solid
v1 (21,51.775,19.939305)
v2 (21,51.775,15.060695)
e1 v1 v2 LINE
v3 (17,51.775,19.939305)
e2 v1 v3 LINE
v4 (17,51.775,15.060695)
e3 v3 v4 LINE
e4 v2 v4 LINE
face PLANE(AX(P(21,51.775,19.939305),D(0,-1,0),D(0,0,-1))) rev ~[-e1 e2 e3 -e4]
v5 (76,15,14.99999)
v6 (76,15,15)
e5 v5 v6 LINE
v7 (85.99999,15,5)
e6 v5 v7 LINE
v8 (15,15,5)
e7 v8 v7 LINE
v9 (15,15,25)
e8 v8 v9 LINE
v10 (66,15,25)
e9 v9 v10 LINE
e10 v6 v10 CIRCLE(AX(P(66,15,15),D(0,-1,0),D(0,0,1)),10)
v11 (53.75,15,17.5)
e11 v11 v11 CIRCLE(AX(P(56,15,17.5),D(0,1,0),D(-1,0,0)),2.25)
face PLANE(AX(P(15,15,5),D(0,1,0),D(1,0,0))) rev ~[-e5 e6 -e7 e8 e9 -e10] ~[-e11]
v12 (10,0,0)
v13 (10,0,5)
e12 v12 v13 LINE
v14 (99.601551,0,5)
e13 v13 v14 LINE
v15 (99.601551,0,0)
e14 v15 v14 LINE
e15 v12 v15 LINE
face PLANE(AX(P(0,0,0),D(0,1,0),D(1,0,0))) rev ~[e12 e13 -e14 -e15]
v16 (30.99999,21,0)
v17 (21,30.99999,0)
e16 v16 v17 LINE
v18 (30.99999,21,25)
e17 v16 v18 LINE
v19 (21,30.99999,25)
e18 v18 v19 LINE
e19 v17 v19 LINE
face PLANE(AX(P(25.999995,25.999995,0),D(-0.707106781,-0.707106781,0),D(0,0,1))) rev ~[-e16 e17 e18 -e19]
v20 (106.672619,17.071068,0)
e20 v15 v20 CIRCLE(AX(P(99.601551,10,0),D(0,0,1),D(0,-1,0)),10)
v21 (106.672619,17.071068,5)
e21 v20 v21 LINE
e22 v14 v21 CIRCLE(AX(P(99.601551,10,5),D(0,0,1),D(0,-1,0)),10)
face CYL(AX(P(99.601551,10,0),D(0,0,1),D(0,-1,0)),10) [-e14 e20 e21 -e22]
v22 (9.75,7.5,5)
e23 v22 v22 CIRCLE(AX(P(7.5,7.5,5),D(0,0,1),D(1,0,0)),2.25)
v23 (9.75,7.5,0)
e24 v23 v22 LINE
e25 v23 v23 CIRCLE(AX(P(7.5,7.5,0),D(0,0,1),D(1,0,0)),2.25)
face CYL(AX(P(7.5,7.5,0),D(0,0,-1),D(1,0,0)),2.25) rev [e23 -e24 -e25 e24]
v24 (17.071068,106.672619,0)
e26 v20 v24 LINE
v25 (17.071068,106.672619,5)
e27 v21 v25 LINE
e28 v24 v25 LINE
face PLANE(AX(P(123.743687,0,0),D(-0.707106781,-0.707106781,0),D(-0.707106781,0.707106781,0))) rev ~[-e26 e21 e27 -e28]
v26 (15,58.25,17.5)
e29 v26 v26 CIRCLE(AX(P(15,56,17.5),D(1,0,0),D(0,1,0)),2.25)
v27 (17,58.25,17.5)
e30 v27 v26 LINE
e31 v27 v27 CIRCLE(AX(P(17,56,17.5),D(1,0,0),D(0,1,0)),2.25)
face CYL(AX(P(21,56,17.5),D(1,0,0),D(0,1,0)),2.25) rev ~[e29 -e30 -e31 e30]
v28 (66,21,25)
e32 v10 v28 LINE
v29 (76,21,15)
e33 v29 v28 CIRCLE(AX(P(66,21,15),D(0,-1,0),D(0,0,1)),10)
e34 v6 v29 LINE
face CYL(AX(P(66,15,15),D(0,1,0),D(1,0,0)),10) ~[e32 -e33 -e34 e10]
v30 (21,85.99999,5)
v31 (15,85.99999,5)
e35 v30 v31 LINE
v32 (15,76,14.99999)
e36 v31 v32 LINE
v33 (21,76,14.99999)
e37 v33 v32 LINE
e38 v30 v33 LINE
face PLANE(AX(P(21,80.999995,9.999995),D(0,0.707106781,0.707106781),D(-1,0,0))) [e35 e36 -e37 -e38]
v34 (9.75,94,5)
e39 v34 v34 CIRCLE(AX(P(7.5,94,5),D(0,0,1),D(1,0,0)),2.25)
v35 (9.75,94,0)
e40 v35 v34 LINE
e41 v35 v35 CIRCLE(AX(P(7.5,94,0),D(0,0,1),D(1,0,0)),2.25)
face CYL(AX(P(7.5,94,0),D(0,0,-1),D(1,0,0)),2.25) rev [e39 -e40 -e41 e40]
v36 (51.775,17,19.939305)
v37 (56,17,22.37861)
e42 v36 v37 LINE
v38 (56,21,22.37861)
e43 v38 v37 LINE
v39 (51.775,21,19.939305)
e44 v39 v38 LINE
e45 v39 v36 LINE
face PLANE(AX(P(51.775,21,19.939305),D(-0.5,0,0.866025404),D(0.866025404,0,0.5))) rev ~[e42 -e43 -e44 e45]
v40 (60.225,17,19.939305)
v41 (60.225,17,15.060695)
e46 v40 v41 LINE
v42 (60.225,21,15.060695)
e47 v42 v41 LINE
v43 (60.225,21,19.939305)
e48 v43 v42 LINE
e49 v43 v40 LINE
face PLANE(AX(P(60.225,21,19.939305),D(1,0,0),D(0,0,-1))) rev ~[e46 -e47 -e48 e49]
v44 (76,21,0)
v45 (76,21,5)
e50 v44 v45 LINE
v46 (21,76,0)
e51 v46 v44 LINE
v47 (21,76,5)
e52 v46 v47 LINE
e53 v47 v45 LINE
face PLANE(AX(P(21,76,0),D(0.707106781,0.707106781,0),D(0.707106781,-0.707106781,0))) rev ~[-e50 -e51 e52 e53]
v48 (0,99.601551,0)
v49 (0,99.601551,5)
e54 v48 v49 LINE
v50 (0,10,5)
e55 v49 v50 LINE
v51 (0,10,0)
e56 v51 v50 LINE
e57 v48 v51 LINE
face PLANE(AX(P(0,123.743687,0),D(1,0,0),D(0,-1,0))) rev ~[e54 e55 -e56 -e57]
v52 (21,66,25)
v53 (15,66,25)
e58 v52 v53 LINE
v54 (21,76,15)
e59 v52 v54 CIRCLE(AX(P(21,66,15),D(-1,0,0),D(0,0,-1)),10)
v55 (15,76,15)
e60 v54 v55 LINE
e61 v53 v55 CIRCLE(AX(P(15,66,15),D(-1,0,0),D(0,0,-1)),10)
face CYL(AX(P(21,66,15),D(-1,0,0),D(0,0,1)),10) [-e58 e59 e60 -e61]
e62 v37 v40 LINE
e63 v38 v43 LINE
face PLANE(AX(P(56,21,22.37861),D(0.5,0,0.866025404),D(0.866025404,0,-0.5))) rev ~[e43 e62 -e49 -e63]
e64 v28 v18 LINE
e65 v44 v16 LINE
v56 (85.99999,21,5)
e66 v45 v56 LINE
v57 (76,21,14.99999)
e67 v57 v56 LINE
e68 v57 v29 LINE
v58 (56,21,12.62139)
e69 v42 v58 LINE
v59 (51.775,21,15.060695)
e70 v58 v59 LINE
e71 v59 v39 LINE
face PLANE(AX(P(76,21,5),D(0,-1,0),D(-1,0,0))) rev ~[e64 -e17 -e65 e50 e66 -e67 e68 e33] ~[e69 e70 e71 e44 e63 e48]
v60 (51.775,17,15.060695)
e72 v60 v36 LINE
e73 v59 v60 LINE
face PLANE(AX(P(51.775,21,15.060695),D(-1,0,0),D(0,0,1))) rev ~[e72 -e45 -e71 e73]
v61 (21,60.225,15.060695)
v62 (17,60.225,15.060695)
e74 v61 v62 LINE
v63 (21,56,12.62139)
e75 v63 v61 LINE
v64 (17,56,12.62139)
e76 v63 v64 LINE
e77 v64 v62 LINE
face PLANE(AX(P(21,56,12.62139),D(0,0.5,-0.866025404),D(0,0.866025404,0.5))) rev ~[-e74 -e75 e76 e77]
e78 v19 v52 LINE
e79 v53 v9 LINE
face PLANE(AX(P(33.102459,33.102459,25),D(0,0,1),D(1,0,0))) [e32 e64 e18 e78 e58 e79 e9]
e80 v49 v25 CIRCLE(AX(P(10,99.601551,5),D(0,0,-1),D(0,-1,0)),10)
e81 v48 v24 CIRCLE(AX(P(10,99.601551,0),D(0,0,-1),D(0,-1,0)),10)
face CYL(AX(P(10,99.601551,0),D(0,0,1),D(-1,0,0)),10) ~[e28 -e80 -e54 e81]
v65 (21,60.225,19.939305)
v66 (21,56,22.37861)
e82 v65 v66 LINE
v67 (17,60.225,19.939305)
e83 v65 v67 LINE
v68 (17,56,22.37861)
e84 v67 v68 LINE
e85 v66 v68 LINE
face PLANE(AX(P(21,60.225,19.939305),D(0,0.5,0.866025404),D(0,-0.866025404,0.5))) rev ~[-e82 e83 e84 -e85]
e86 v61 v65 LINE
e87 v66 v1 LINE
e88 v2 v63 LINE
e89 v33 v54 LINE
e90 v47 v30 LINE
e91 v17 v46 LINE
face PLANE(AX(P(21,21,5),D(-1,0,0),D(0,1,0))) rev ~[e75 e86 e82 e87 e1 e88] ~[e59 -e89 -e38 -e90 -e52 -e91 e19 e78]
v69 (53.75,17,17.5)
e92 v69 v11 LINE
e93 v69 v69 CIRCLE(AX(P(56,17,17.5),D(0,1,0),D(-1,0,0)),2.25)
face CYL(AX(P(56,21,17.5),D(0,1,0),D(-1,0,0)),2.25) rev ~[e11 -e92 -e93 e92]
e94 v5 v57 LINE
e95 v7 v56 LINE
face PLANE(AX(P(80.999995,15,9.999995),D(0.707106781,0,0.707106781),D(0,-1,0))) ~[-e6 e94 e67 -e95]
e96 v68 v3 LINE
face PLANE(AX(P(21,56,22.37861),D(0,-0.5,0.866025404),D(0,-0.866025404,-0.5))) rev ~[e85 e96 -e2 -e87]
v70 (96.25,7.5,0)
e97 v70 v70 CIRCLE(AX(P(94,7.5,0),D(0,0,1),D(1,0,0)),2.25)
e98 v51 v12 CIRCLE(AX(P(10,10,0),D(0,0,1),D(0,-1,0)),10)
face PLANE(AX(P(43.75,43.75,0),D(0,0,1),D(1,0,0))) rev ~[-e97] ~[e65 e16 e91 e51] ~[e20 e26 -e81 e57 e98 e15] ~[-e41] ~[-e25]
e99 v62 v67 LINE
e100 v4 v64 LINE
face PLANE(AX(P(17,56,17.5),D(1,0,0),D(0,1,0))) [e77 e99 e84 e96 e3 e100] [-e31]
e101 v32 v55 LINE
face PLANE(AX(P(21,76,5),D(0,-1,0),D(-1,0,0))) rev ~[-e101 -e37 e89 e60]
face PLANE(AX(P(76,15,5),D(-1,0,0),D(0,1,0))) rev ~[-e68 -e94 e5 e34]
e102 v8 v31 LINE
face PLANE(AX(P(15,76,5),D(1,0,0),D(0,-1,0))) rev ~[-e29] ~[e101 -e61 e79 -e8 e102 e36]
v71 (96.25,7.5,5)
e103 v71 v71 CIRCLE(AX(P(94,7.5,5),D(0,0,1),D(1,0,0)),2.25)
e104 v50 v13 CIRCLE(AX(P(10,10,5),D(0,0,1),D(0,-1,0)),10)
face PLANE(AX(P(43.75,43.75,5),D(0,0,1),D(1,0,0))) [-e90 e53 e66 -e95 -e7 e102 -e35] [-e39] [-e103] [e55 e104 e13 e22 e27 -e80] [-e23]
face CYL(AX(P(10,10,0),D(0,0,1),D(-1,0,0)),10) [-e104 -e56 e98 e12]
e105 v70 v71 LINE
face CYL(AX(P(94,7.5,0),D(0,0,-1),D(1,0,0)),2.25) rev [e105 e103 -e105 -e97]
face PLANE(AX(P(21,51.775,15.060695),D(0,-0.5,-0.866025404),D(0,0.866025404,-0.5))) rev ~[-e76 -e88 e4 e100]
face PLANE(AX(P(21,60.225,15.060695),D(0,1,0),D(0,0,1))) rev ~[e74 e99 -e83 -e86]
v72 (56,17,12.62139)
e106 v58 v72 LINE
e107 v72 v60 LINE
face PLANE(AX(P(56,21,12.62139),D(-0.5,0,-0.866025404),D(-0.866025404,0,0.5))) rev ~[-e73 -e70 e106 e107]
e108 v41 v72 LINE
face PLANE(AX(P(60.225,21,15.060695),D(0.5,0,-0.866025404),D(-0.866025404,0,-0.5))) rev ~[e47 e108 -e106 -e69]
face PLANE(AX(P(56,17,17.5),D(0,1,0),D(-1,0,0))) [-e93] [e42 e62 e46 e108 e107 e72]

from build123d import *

# Parameters (mm, degrees)
F0_R      = 2.25
F1_DEPTH  = 5
F3_DEPTH  = 20
F4_R      = 10
F5_R      = 2.25
F6_DEPTH  = 25
F7_R      = 2.25
F8_DEPTH  = 25
F9_SIZE   = 9.99999
F11_DEPTH = 4
F13_DEPTH = 4


# Not quite as in the source:
# - a fillet or chamfer is up to 0.001 mm smaller than in the source, because OpenCascade refuses the exact size


with BuildPart() as f1:
    # F0 (on Top) → F1 (new body)
    with BuildSketch(Plane.XY):
        Polygon((123.7436867076, 0), (0, 123.7436867076), (0, 103.7436867076), (0, 0), (103.7436867076, 0), align=None)
        with Locations((7.5, 7.5)):
            Circle(F0_R, mode=Mode.SUBTRACT)
        Polygon((21, 21), (21, 76), (76, 21), align=None, mode=Mode.SUBTRACT)
        with Locations((94, 7.5)):
            Circle(F0_R, mode=Mode.SUBTRACT)
        with Locations((7.5, 94)):
            Circle(F0_R, mode=Mode.SUBTRACT)
    extrude(amount=F1_DEPTH)

    # F2 (on face) → F3 (join)
    with BuildSketch(Plane.XY.offset(5)):
        Polygon((76, 15), (76, 21), (21, 21), (21, 76), (15, 76), (15, 15), align=None)
    extrude(amount=F3_DEPTH)

    # F4
    f4_edges = [f1.edges().sort_by_distance(p)[0] for p in [
        (0, 123.743687, 2.5),
        (123.743687, 0, 2.5),
        (76, 18, 25),
        (18, 76, 25),
        (0, 0, 2.5),
    ]]
    fillet(f4_edges, radius=F4_R)

    # F5 (on face) → F6 (cut)
    with BuildSketch(Plane.YZ.offset(21)):
        with Locations((56, 17.5)):
            Circle(F5_R)
    extrude(amount=-F6_DEPTH, mode=Mode.SUBTRACT)

    # F7 (on face) → F8 (cut)
    with BuildSketch(Plane(origin=(0, 21, 0), x_dir=(-1, 0, 0), z_dir=(0, 1, 0))):
        with Locations((-56, 17.5)):
            Circle(F7_R)
    extrude(amount=-F8_DEPTH, mode=Mode.SUBTRACT)

    # F9 (size 10 in the source; OpenCascade refuses exactly that, so slightly less here)
    f9_edges = [f1.edges().sort_by_distance(p)[0] for p in [
        (18, 76, 5),
        (76, 18, 5),
        (21, 21, 12.5),
    ]]
    chamfer(f9_edges, length=F9_SIZE)

    # F10 (on face) → F11 (cut)
    with BuildSketch(Plane(origin=(0, 21, 0), x_dir=(-1, 0, 0), z_dir=(0, 1, 0))):
        Polygon((-51.775, 15.0606951127), (-51.775, 19.9393048873), (-56, 22.3786097747), (-60.225, 19.9393048873), (-60.225, 15.0606951127), (-56, 12.6213902253), align=None)
    extrude(amount=-F11_DEPTH, mode=Mode.SUBTRACT)

    # F12 (on face) → F13 (cut)
    with BuildSketch(Plane.YZ.offset(21)):
        Polygon((60.225, 15.0606951127), (60.225, 19.9393048873), (56, 22.3786097747), (51.775, 19.9393048873), (51.775, 15.0606951127), (56, 12.6213902253), align=None)
    extrude(amount=-F13_DEPTH, mode=Mode.SUBTRACT)


solid = f1.part
